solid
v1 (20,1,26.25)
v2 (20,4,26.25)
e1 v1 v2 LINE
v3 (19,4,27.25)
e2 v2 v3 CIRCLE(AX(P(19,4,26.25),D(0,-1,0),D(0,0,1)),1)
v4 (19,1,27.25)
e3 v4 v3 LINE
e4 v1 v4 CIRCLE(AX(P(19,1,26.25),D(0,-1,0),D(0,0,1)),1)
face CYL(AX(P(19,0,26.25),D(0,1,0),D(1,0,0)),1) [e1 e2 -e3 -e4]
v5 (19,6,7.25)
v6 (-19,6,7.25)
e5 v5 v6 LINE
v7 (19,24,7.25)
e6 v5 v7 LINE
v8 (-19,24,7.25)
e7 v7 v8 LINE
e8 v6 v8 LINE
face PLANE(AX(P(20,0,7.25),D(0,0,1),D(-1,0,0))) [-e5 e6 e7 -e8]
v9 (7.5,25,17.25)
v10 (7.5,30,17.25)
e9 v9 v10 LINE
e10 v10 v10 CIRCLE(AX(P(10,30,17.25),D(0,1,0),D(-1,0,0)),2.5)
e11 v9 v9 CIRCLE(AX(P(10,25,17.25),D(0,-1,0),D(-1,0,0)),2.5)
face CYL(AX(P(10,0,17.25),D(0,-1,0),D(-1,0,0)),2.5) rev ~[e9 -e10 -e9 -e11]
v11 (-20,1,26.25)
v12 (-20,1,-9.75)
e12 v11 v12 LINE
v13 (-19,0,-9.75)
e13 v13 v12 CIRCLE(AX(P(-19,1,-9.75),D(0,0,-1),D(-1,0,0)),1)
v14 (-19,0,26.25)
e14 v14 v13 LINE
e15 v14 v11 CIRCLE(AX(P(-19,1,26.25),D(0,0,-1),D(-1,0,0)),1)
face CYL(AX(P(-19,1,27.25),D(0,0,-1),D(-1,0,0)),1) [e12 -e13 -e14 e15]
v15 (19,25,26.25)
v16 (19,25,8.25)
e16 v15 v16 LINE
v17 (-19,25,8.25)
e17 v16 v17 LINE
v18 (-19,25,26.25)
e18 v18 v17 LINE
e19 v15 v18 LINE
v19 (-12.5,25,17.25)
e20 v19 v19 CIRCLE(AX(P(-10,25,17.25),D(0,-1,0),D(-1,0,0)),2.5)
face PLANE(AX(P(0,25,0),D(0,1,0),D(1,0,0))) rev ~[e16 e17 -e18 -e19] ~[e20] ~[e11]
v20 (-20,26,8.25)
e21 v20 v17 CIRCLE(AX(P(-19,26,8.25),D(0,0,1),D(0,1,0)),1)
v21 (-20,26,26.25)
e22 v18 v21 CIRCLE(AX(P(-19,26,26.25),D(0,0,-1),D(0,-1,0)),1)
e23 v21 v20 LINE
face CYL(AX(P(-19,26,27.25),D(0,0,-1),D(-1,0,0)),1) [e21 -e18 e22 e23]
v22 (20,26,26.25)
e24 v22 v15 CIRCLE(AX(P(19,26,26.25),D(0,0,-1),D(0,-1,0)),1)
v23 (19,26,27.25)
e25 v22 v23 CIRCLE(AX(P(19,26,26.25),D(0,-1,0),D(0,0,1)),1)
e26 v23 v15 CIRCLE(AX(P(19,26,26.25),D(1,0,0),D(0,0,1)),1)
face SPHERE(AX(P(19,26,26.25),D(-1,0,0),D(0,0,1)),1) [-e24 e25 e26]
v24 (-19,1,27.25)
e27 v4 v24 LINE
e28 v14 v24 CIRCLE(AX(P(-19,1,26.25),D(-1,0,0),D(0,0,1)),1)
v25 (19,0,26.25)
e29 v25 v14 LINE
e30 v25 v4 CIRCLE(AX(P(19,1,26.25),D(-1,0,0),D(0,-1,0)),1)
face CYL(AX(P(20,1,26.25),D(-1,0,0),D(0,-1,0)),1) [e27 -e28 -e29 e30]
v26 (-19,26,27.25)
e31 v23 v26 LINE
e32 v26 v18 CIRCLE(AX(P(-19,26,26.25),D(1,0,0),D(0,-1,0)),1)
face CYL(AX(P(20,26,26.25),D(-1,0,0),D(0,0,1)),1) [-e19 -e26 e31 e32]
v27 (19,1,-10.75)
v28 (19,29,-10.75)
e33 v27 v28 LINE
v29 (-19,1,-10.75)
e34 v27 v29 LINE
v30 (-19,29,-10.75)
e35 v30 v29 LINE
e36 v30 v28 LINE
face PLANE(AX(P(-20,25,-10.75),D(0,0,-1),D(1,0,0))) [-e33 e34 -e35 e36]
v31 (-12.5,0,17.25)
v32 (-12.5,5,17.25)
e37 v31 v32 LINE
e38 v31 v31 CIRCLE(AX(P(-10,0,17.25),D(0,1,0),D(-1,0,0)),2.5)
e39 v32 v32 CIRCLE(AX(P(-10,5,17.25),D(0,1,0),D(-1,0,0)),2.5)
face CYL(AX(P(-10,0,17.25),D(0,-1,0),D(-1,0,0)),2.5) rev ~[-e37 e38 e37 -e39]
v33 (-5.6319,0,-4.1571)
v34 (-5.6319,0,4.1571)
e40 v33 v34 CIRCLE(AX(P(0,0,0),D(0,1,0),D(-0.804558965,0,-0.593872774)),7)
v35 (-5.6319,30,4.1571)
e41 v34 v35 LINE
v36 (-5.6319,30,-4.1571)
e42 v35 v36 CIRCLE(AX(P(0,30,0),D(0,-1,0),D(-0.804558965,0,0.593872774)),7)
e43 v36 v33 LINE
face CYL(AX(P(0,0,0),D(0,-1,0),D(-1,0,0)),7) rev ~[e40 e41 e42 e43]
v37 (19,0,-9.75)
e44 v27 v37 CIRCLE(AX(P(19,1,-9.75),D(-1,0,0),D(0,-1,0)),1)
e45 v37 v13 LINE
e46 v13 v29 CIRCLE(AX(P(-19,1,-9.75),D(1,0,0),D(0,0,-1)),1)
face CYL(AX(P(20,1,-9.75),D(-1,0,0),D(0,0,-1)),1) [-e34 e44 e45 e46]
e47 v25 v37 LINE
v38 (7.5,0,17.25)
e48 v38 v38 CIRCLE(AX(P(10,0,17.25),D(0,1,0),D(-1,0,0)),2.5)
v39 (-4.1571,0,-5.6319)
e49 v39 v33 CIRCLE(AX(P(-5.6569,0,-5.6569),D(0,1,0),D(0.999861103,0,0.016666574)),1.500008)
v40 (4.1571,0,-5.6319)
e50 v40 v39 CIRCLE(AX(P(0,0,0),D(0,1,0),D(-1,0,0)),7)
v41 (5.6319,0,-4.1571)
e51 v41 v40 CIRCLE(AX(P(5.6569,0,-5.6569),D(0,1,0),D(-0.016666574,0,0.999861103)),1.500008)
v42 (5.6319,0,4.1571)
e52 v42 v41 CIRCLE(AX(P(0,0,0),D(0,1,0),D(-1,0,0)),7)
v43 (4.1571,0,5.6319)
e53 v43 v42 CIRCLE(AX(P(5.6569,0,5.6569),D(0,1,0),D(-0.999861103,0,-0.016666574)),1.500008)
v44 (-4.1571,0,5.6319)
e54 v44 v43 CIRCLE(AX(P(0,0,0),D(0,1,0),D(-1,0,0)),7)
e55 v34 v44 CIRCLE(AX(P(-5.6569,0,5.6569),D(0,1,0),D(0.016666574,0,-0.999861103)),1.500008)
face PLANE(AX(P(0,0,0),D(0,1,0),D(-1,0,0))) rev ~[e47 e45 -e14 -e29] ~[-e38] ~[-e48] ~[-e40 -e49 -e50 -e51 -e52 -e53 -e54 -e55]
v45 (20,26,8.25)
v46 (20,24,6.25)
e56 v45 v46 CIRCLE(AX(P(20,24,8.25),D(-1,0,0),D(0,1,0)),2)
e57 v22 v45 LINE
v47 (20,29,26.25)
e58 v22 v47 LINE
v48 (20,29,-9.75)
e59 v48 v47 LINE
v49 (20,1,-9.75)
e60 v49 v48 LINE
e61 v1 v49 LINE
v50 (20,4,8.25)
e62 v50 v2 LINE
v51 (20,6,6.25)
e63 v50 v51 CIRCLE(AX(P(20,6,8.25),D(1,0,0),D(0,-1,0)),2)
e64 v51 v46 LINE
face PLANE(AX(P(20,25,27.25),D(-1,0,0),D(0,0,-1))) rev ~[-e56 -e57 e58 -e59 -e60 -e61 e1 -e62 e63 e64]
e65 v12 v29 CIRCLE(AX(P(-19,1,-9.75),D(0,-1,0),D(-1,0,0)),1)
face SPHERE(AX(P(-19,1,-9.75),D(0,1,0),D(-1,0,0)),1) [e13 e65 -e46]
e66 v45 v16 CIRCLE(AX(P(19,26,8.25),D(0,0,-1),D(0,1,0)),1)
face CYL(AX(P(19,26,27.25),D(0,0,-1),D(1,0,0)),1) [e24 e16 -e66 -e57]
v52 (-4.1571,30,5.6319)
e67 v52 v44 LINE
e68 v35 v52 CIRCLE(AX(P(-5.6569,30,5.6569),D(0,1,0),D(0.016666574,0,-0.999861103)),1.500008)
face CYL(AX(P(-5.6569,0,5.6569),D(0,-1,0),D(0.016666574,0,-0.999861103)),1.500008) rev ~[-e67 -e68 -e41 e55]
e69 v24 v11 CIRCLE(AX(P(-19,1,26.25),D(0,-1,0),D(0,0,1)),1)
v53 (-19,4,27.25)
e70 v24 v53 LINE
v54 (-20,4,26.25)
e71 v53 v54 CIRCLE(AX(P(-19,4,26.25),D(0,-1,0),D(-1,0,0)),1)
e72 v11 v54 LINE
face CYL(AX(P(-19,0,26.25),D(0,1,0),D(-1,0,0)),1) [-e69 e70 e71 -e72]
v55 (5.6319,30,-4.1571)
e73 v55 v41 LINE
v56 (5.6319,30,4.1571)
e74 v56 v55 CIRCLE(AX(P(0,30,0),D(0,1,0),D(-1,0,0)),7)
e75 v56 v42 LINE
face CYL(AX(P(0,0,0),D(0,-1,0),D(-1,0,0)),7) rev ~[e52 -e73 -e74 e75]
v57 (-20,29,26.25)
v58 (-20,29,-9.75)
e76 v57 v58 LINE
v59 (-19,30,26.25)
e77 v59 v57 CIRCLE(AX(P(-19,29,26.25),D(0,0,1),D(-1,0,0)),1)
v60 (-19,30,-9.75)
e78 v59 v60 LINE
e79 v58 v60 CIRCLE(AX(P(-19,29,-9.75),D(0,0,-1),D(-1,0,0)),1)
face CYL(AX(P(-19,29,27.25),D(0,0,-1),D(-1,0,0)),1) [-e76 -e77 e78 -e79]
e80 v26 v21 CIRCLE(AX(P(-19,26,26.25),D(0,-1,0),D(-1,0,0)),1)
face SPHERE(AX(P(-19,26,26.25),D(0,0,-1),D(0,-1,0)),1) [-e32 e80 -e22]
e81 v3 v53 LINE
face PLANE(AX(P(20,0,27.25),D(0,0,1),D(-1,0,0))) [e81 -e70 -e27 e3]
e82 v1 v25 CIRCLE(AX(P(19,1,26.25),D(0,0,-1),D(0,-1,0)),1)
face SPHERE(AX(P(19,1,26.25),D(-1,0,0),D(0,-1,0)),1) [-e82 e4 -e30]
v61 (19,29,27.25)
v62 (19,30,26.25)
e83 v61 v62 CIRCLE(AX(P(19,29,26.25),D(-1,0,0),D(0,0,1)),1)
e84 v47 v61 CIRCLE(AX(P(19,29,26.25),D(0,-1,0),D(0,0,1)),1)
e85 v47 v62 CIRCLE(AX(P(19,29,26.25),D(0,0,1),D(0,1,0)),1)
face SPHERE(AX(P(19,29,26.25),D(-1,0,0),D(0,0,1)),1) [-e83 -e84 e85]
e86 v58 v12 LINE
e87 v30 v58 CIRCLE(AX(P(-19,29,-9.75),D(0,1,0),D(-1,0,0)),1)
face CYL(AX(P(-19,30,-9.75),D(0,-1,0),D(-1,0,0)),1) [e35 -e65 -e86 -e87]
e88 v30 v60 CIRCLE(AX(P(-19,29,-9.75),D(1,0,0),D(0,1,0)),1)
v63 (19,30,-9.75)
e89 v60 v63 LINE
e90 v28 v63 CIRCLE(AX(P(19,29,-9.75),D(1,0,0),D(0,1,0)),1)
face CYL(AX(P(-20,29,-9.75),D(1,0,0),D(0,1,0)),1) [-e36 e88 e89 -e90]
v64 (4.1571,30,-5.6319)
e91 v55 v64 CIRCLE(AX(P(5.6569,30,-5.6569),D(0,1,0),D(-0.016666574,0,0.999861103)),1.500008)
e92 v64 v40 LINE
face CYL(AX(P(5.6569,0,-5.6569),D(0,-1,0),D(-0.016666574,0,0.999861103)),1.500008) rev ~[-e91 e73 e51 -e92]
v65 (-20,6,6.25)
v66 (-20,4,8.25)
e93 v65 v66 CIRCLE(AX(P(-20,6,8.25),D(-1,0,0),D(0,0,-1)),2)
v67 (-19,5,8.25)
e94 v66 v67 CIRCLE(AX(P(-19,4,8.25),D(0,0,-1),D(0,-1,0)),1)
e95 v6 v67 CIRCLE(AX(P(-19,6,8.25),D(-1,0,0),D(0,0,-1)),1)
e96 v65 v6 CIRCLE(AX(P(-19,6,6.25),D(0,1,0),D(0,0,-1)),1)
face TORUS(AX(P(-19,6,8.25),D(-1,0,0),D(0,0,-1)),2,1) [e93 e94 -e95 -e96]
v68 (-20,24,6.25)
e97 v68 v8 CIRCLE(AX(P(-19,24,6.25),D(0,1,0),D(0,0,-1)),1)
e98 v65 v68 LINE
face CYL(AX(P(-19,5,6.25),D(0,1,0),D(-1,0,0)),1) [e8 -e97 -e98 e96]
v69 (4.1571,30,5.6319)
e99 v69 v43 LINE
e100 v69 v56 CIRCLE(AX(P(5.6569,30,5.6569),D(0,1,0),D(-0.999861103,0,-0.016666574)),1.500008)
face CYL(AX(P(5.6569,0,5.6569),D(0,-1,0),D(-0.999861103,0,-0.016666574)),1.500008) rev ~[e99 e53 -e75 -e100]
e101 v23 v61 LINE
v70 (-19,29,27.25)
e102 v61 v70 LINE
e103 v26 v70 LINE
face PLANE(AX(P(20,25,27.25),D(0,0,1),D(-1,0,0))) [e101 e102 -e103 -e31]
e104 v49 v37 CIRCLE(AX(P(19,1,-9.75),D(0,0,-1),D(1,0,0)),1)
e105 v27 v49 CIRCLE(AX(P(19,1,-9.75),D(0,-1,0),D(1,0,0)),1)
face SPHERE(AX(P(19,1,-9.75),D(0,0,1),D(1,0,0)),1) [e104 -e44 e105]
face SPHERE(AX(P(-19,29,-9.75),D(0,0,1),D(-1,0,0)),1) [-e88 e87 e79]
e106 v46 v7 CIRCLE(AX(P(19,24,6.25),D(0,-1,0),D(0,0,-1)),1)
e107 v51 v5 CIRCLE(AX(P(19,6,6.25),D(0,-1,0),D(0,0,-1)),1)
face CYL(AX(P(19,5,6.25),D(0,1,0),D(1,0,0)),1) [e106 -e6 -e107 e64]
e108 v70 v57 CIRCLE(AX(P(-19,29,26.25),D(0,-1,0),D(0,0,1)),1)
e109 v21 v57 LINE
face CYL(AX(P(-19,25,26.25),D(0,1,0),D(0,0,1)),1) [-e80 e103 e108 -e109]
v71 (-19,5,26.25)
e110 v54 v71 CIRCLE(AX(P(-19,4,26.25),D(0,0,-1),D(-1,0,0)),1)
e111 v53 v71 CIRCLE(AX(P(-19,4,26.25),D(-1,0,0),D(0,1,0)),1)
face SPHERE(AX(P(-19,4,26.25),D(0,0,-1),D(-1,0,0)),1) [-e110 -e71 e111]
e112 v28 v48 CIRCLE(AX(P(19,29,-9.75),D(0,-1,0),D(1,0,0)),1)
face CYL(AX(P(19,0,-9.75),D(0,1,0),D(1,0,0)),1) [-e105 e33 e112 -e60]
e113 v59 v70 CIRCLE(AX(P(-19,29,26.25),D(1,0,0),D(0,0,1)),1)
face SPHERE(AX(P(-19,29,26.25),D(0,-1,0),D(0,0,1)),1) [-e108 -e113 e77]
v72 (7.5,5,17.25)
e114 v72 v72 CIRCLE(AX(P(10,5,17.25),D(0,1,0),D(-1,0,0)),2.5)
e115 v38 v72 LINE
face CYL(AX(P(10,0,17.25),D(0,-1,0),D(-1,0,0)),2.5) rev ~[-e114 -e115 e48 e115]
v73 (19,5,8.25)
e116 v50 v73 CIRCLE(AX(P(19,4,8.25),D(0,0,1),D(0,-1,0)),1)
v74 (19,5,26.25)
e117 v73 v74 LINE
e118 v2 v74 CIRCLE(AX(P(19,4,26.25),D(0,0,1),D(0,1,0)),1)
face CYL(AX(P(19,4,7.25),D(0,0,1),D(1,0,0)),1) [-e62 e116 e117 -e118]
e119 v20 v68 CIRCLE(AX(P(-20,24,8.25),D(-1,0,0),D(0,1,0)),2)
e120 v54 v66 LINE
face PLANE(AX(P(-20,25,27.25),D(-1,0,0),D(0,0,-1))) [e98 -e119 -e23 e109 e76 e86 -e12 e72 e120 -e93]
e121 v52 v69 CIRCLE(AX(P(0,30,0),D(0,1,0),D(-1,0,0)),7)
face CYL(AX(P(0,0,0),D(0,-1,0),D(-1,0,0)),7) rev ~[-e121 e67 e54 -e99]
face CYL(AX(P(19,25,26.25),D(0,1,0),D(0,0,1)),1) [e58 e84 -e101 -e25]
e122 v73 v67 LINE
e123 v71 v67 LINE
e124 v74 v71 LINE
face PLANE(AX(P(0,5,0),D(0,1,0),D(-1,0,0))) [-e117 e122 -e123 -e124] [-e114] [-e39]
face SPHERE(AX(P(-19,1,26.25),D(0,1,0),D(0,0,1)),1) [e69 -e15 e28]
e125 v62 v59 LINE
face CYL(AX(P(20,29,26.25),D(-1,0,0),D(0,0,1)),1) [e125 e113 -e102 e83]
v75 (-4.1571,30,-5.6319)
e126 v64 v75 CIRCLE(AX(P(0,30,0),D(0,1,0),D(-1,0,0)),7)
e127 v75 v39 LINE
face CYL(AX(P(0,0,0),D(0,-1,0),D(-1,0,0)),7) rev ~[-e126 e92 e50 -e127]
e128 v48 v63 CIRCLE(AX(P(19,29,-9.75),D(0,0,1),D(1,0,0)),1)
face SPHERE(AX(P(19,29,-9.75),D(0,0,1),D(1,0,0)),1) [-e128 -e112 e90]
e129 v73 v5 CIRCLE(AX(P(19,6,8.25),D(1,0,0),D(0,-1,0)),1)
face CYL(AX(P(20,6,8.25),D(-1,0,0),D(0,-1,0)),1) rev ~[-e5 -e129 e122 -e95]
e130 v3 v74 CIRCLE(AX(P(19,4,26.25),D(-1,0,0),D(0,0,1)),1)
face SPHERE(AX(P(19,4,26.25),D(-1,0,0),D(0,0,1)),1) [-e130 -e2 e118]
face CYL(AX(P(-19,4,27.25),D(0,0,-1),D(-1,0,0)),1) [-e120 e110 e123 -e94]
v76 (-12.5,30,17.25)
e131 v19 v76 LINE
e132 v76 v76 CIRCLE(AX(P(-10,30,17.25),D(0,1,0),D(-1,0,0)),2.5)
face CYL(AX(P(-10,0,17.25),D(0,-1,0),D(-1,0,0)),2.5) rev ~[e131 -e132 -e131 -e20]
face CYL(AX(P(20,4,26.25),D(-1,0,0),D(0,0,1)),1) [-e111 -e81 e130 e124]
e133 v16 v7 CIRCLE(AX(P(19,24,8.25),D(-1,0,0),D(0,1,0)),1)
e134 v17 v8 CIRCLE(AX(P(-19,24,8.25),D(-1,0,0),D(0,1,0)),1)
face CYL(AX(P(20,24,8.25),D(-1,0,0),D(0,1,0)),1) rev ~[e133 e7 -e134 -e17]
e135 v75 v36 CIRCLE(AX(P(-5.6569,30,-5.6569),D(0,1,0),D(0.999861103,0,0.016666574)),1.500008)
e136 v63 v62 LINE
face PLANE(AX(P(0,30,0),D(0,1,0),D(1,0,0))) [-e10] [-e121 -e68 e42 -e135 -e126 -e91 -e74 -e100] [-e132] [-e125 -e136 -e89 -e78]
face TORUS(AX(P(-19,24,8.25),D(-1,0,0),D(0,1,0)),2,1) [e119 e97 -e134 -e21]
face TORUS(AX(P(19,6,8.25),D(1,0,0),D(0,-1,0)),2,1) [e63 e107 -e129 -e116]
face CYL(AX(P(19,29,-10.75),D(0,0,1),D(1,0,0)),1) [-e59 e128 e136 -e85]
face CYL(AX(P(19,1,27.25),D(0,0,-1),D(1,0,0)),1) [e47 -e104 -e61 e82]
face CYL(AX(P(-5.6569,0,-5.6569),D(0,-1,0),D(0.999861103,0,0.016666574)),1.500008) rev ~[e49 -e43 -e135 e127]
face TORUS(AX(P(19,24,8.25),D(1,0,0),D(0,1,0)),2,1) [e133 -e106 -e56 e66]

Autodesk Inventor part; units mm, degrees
ref_plane "YZ Plane" through (0, 0, 0) normal (1, 0, 0) x (0, 1, 0)
ref_plane "XZ Plane" through (0, 0, 0) normal (0, 1, 0) x (-1, 0, 0)
ref_plane "XY Plane" through (0, 0, 0) normal (0, 0, 1) x (1, 0, 0)
sketch "Sketch1" plane through (0, 0, 0) normal (0, 1, 0) x (-1, 0, 0)
  circle A0 centre (0, 0) radius 7
  circle A1 centre (0, 0) radius 8 construction
  line L0 (0, 0) -> (5.6569, -5.6569) construction
  line L1 (0, 0) -> (8, 0) construction
  line L2 (0, 0) -> (-5.6569, -5.6569) construction
  line L3 (0, 0) -> (8, 0) construction
  line L4 (0, 0) -> (5.6569, 5.6569) construction
  line L5 (0, 0) -> (-5.6569, 5.6569) construction
  arc A2 (5.6319, 4.1571) -> (4.1571, 5.6319) centre (5.6569, 5.6569) ccw
  arc A3 (-4.1571, 5.6319) -> (-5.6319, 4.1571) centre (-5.6569, 5.6569) ccw
  arc A4 (-5.6319, -4.1571) -> (-4.1571, -5.6319) centre (-5.6569, -5.6569) ccw
  arc A5 (4.1571, -5.6319) -> (5.6319, -4.1571) centre (5.6569, -5.6569) ccw
  arc A6 (4.5962, 4.5962) -> (5.6319, 4.1571) centre (5.6569, 5.6569) ccw
  arc A7 (4.1571, 5.6319) -> (4.5962, 4.5962) centre (5.6569, 5.6569) ccw
  arc A8 (-4.5962, 4.5962) -> (-4.1571, 5.6319) centre (-5.6569, 5.6569) ccw
  arc A9 (-5.6319, 4.1571) -> (-4.5962, 4.5962) centre (-5.6569, 5.6569) ccw
  arc A10 (-4.5962, -4.5962) -> (-5.6319, -4.1571) centre (-5.6569, -5.6569) ccw
  arc A11 (-4.1571, -5.6319) -> (-4.5962, -4.5962) centre (-5.6569, -5.6569) ccw
  arc A12 (4.5962, -4.5962) -> (4.1571, -5.6319) centre (5.6569, -5.6569) ccw
  arc A13 (5.6319, -4.1571) -> (4.5962, -4.5962) centre (5.6569, -5.6569) ccw
  line L6 (-20, 7.25) -> (20, 7.25)
  line L7 (20, 7.25) -> (20, -7.25) construction
  line L8 (20, -7.25) -> (-20, -7.25) construction
  line L9 (-20, -7.25) -> (-20, 7.25) construction
  line L10 (-20, 7.25) -> (20, -7.25) construction
  line L11 (20, 7.25) -> (-20, -7.25) construction
  line L12 (20, 7.25) -> (-20, 7.25)
  line L13 (-20, 7.25) -> (-20, 27.25)
  line L14 (-20, 27.25) -> (20, 27.25)
  line L15 (20, 27.25) -> (20, 7.25)
  line L16 (20, 17.25) -> (-20, 17.25) construction
  circle A14 centre (10, 17.25) radius 2.5
  circle A15 centre (-10, 17.25) radius 2.5
  line L17 (20, 7.25) -> (-20, 7.25)
  line L18 (-20, 7.25) -> (-20, -10.75)
  line L19 (-20, -10.75) -> (20, -10.75)
  line L20 (20, -10.75) -> (20, 7.25)
  dimension "d0" = 14
  dimension "d1" = 16
  dimension "d2" = 45
  dimension "d3" = 135
  dimension "d4" = 3
  dimension "d5" = 3
  dimension "d6" = 3
  dimension "d7" = 3
  dimension "d9" = 14.5
  dimension "d10" = 20
  dimension "d11" = 40
  dimension "d14" = 5
  dimension "d15" = 5
  dimension "d16" = 10
  dimension "d17" = 10
  dimension "d22" = 18
  dimension "d23" = 40
  dimension "d24" = 40
extrude "Extrusion1" add sketch "Sketch1" along normal blind 5 contours L13 L14 L15 L6
extrude "Extrusion3" add sketch "Sketch1" along normal blind 25 contours L6 L20 L19 L18
sketch "Sketch3" plane through (0, 25, 0) normal (0, 1, 0) x (1, 0, 0)
  line L0 (20, -27.25) -> (20, -7.25) projected
  line L1 (-20, 10.75) -> (20, 10.75)
  line L2 (20, 10.75) -> (20, -27.25)
  line L3 (20, -27.25) -> (-20, -27.25)
  line L4 (-20, -27.25) -> (-20, 10.75)
  point P0 (0, 0)
extrude "Extrusion4" add sketch "Sketch3" along normal blind 5
extrude "Extrusion5" cut sketch "Sketch1" along normal blind 30 contours A0 A13 A12 A11 A10 A9 A8 A7 A6 | A6 A7 A0 | A0 A2 | A5 A0 | A0 A12 A13 | A8 A9 A0 | A0 A3 | A4 A0 | A0 A10 A11 | A14 | A15
fillet "Fillet2" radius 1 24 edges at (-20, 15, 7.25) (0, 25, 7.25) (-20, 25, 17.25) (0, 25, 27.25) (-20, 27.5, 27.25) (0, 30, 27.25) (20, 27.5, 27.25) (20, 25, 17.25) (-20, 30, 8.25) (-20, 15, -10.75) (-20, 5, 17.25) (-20, 2.5, 27.25) (0, 5, 27.25) (0, 0, 27.25) (-20, 0, 8.25) (20, 0, 8.25) (20, 2.5, 27.25) (20, 15, 7.25) (0, 5, 7.25) (20, 5, 17.25) (20, 30, 8.25) (20, 15, -10.75) (0, 30, -10.75) (0, 0, -10.75)
equation "\"d4\" = d5"
equation "\"d6\" = d5"
equation "\"d7\" = d5"
equation "\"d11\" = d13"
equation "\"d17\" = d16"
equation "\"d24\" = d23"
equation "\"d13\" = 40"
properties part number "z_nut_holder" material "ABS Plastic"
